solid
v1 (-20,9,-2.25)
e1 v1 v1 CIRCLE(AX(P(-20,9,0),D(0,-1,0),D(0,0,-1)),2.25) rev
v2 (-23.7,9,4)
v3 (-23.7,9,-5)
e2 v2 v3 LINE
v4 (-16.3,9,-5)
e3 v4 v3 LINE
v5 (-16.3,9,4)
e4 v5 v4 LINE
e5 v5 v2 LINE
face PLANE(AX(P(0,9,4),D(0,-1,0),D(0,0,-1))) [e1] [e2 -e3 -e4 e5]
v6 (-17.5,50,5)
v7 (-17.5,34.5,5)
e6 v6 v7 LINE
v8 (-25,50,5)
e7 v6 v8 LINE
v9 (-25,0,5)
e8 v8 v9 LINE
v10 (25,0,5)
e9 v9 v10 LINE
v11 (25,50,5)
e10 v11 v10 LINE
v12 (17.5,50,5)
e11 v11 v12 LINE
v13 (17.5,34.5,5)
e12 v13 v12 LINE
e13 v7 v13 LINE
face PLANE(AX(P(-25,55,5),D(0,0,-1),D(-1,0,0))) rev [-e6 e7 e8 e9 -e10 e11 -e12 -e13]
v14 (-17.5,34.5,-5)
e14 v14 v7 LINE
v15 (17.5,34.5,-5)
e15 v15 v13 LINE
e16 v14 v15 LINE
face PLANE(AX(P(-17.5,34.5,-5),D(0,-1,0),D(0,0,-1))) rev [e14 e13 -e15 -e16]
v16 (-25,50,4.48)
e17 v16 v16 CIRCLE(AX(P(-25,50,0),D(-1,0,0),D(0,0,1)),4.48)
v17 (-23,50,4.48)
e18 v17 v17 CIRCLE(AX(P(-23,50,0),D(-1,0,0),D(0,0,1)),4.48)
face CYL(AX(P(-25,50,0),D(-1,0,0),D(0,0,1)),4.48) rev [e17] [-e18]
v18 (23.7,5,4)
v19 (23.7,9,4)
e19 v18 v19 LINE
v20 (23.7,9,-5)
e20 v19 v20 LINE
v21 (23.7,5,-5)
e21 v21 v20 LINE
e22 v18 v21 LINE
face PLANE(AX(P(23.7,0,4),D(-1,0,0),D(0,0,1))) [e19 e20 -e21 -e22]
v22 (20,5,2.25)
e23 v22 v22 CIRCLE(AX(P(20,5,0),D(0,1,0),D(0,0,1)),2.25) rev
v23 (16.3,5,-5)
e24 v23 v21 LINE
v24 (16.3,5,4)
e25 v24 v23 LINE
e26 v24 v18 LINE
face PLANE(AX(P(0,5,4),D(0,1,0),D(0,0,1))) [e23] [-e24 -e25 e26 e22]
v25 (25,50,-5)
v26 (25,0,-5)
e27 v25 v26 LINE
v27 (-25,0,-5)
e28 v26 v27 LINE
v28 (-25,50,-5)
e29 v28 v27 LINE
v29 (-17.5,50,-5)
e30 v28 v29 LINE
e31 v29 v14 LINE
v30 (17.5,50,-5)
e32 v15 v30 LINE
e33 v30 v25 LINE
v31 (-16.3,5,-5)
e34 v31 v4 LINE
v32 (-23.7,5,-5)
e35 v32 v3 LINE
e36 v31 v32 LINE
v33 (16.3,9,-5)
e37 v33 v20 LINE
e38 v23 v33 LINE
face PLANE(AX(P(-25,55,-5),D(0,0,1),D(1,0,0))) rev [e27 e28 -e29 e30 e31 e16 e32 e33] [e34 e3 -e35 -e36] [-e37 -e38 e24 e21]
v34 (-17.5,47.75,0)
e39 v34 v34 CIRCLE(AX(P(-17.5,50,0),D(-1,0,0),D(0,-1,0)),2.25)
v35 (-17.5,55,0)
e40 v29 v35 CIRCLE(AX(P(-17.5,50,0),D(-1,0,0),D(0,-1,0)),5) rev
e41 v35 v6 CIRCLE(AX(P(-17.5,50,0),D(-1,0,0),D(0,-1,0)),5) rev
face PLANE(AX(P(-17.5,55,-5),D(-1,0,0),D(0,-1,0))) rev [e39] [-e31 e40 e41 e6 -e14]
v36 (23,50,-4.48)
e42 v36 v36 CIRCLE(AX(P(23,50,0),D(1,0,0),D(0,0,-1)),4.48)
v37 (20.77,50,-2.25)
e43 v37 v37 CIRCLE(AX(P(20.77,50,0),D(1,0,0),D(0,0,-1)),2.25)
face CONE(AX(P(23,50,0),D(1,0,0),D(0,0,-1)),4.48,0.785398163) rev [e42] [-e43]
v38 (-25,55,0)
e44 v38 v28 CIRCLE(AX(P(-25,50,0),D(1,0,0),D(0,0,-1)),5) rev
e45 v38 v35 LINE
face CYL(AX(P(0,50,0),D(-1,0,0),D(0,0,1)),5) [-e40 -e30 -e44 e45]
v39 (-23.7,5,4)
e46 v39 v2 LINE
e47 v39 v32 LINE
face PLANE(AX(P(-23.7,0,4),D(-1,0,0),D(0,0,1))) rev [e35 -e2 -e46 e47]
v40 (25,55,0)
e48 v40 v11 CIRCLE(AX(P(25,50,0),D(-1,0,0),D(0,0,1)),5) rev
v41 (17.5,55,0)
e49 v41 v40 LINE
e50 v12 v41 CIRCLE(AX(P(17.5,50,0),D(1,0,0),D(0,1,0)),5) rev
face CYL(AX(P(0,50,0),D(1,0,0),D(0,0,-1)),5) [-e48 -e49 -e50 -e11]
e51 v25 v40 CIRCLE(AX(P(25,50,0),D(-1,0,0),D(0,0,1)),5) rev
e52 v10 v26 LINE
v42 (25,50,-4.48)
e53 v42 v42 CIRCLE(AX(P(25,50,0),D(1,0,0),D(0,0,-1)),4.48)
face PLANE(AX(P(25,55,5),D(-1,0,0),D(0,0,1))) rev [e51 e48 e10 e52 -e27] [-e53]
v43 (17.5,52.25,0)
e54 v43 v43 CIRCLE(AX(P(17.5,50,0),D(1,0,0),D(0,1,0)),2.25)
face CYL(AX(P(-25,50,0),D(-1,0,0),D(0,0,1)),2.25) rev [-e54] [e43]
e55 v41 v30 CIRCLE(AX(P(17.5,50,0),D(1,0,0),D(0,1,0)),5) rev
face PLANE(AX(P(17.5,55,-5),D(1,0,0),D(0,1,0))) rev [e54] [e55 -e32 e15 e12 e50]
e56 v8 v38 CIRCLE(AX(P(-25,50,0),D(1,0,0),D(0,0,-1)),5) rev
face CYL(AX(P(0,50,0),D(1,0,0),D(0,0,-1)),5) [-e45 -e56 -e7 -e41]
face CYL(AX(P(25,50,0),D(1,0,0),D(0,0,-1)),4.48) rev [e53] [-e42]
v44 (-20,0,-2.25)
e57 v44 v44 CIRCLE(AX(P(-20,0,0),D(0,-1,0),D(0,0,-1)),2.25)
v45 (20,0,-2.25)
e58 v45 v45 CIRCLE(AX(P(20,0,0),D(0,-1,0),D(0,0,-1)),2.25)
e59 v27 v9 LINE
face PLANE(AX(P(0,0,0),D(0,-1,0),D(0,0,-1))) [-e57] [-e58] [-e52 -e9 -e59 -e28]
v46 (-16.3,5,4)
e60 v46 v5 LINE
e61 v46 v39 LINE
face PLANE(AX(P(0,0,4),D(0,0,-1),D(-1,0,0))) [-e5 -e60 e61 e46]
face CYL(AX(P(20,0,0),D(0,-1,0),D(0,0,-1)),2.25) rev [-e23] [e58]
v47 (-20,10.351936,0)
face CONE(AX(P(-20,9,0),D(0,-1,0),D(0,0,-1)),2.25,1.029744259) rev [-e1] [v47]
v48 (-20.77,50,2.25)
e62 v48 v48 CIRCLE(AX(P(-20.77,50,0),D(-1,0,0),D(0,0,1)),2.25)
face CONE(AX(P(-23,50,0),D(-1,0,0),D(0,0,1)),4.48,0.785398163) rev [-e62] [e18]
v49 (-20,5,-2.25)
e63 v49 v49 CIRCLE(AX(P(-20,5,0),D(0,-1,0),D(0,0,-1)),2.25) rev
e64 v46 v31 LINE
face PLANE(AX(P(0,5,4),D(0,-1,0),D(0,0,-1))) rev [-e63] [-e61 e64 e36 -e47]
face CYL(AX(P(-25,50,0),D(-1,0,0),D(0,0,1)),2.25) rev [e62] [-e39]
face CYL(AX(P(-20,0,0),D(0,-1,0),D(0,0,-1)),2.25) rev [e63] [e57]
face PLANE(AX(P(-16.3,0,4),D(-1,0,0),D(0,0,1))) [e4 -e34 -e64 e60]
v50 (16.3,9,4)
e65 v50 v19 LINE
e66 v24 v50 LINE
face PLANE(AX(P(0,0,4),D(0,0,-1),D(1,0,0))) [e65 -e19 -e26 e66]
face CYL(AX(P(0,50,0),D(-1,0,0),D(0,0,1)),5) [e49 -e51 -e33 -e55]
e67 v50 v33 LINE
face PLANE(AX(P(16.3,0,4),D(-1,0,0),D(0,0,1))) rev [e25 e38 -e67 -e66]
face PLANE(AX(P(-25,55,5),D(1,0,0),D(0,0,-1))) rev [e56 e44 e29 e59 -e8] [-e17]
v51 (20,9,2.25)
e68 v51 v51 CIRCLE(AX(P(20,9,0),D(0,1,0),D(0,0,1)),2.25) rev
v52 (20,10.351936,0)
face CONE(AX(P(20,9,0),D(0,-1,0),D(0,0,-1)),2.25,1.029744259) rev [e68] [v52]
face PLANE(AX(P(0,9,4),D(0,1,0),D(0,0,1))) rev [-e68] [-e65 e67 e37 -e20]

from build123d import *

# Parameters (mm, degrees)
SKETCH1_W                = 50
SKETCH1_H                = 10
BOSS_EXTRUDE1_DEPTH      = 55
FILLET1_R                = 5
SKETCH2_W                = 35
SKETCH2_H                = 20.5
CUT_EXTRUDE1_DEPTH       = 62.23724357
M4_CLEARANCE_HOLE1_D     = 4.5
M4_CLEARANCE_HOLE1_DEPTH = 9
M4_CLEARANCE_HOLE1_TIP   = 1.351936393
SKETCH9_W                = 7.4
SKETCH9_H                = 4
CUT_EXTRUDE2_DEPTH       = 9


with BuildPart() as part:
    # Sketch1 → Boss-Extrude1 (new body)
    with BuildSketch(Plane(origin=(0, 0, 0), x_dir=(1, 0, 0), z_dir=(0, 1, 0))):
        Rectangle(SKETCH1_W, SKETCH1_H)
    extrude(amount=BOSS_EXTRUDE1_DEPTH)

    # Fillet1
    fillet1_edges = [part.edges().sort_by_distance(p)[0] for p in [
        (0, 55, -5),
        (0, 55, 5),
    ]]
    fillet(fillet1_edges, radius=FILLET1_R - 0.0001)  # a hair under: the kernel refuses the full size

    # Sketch2 → Cut-Extrude1 (cut, through all)
    with BuildSketch(Plane.XY.offset(5)):
        with Locations((0, 44.75)):
            Rectangle(SKETCH2_W, SKETCH2_H)
    extrude(amount=-CUT_EXTRUDE1_DEPTH, mode=Mode.SUBTRACT)

    # Sketch5 → CSK for M4 SFHCS1 (revolve, cut)
    with BuildSketch(Plane(origin=(-25, 50, 0), x_dir=(0, 0, 1), z_dir=(0, 1, 0))):
        Polygon((0, 0), (0, 50), (2.25, 50), (2.25, 4.23), (4.48, 2), (4.48, 0), align=None)
    csk_for_m4_sfhcs1 = revolve(axis=Axis((-31.35, 50, 0), (1, 0, 0)), mode=Mode.SUBTRACT)

    # Mirror1: CSK for M4 SFHCS1 across plane
    add(csk_for_m4_sfhcs1.mirror(Plane(origin=(0, 0, 0), x_dir=(0, 0, 1), z_dir=(1, 0, 0))), mode=Mode.SUBTRACT)

    # M4 Clearance Hole1
    with Locations(Plane(origin=(0, 0, 0), x_dir=(-1, 0, 0), z_dir=(0, -1, 0))):
        with Locations((-20, 0), (20, 0)):
            Hole(M4_CLEARANCE_HOLE1_D / 2, depth=M4_CLEARANCE_HOLE1_DEPTH)
            with Locations((0, 0, -(M4_CLEARANCE_HOLE1_DEPTH + M4_CLEARANCE_HOLE1_TIP / 2))):  # 118° drill point
                Cone(0, M4_CLEARANCE_HOLE1_D / 2, M4_CLEARANCE_HOLE1_TIP, mode=Mode.SUBTRACT)

    # Sketch9 → Cut-Extrude2 (cut)
    with BuildSketch(Plane(origin=(0, 0, -5), x_dir=(-1, 0, 0), z_dir=(0, 0, -1))):
        with Locations((20, 7)):
            Rectangle(SKETCH9_W, SKETCH9_H)
    cut_extrude2 = extrude(amount=-CUT_EXTRUDE2_DEPTH, mode=Mode.SUBTRACT)

    # Mirror2: Cut-Extrude2 across plane
    add(cut_extrude2.mirror(Plane(origin=(0, 0, 0), x_dir=(0, 0, 1), z_dir=(1, 0, 0))), mode=Mode.SUBTRACT)


solid = part.part
